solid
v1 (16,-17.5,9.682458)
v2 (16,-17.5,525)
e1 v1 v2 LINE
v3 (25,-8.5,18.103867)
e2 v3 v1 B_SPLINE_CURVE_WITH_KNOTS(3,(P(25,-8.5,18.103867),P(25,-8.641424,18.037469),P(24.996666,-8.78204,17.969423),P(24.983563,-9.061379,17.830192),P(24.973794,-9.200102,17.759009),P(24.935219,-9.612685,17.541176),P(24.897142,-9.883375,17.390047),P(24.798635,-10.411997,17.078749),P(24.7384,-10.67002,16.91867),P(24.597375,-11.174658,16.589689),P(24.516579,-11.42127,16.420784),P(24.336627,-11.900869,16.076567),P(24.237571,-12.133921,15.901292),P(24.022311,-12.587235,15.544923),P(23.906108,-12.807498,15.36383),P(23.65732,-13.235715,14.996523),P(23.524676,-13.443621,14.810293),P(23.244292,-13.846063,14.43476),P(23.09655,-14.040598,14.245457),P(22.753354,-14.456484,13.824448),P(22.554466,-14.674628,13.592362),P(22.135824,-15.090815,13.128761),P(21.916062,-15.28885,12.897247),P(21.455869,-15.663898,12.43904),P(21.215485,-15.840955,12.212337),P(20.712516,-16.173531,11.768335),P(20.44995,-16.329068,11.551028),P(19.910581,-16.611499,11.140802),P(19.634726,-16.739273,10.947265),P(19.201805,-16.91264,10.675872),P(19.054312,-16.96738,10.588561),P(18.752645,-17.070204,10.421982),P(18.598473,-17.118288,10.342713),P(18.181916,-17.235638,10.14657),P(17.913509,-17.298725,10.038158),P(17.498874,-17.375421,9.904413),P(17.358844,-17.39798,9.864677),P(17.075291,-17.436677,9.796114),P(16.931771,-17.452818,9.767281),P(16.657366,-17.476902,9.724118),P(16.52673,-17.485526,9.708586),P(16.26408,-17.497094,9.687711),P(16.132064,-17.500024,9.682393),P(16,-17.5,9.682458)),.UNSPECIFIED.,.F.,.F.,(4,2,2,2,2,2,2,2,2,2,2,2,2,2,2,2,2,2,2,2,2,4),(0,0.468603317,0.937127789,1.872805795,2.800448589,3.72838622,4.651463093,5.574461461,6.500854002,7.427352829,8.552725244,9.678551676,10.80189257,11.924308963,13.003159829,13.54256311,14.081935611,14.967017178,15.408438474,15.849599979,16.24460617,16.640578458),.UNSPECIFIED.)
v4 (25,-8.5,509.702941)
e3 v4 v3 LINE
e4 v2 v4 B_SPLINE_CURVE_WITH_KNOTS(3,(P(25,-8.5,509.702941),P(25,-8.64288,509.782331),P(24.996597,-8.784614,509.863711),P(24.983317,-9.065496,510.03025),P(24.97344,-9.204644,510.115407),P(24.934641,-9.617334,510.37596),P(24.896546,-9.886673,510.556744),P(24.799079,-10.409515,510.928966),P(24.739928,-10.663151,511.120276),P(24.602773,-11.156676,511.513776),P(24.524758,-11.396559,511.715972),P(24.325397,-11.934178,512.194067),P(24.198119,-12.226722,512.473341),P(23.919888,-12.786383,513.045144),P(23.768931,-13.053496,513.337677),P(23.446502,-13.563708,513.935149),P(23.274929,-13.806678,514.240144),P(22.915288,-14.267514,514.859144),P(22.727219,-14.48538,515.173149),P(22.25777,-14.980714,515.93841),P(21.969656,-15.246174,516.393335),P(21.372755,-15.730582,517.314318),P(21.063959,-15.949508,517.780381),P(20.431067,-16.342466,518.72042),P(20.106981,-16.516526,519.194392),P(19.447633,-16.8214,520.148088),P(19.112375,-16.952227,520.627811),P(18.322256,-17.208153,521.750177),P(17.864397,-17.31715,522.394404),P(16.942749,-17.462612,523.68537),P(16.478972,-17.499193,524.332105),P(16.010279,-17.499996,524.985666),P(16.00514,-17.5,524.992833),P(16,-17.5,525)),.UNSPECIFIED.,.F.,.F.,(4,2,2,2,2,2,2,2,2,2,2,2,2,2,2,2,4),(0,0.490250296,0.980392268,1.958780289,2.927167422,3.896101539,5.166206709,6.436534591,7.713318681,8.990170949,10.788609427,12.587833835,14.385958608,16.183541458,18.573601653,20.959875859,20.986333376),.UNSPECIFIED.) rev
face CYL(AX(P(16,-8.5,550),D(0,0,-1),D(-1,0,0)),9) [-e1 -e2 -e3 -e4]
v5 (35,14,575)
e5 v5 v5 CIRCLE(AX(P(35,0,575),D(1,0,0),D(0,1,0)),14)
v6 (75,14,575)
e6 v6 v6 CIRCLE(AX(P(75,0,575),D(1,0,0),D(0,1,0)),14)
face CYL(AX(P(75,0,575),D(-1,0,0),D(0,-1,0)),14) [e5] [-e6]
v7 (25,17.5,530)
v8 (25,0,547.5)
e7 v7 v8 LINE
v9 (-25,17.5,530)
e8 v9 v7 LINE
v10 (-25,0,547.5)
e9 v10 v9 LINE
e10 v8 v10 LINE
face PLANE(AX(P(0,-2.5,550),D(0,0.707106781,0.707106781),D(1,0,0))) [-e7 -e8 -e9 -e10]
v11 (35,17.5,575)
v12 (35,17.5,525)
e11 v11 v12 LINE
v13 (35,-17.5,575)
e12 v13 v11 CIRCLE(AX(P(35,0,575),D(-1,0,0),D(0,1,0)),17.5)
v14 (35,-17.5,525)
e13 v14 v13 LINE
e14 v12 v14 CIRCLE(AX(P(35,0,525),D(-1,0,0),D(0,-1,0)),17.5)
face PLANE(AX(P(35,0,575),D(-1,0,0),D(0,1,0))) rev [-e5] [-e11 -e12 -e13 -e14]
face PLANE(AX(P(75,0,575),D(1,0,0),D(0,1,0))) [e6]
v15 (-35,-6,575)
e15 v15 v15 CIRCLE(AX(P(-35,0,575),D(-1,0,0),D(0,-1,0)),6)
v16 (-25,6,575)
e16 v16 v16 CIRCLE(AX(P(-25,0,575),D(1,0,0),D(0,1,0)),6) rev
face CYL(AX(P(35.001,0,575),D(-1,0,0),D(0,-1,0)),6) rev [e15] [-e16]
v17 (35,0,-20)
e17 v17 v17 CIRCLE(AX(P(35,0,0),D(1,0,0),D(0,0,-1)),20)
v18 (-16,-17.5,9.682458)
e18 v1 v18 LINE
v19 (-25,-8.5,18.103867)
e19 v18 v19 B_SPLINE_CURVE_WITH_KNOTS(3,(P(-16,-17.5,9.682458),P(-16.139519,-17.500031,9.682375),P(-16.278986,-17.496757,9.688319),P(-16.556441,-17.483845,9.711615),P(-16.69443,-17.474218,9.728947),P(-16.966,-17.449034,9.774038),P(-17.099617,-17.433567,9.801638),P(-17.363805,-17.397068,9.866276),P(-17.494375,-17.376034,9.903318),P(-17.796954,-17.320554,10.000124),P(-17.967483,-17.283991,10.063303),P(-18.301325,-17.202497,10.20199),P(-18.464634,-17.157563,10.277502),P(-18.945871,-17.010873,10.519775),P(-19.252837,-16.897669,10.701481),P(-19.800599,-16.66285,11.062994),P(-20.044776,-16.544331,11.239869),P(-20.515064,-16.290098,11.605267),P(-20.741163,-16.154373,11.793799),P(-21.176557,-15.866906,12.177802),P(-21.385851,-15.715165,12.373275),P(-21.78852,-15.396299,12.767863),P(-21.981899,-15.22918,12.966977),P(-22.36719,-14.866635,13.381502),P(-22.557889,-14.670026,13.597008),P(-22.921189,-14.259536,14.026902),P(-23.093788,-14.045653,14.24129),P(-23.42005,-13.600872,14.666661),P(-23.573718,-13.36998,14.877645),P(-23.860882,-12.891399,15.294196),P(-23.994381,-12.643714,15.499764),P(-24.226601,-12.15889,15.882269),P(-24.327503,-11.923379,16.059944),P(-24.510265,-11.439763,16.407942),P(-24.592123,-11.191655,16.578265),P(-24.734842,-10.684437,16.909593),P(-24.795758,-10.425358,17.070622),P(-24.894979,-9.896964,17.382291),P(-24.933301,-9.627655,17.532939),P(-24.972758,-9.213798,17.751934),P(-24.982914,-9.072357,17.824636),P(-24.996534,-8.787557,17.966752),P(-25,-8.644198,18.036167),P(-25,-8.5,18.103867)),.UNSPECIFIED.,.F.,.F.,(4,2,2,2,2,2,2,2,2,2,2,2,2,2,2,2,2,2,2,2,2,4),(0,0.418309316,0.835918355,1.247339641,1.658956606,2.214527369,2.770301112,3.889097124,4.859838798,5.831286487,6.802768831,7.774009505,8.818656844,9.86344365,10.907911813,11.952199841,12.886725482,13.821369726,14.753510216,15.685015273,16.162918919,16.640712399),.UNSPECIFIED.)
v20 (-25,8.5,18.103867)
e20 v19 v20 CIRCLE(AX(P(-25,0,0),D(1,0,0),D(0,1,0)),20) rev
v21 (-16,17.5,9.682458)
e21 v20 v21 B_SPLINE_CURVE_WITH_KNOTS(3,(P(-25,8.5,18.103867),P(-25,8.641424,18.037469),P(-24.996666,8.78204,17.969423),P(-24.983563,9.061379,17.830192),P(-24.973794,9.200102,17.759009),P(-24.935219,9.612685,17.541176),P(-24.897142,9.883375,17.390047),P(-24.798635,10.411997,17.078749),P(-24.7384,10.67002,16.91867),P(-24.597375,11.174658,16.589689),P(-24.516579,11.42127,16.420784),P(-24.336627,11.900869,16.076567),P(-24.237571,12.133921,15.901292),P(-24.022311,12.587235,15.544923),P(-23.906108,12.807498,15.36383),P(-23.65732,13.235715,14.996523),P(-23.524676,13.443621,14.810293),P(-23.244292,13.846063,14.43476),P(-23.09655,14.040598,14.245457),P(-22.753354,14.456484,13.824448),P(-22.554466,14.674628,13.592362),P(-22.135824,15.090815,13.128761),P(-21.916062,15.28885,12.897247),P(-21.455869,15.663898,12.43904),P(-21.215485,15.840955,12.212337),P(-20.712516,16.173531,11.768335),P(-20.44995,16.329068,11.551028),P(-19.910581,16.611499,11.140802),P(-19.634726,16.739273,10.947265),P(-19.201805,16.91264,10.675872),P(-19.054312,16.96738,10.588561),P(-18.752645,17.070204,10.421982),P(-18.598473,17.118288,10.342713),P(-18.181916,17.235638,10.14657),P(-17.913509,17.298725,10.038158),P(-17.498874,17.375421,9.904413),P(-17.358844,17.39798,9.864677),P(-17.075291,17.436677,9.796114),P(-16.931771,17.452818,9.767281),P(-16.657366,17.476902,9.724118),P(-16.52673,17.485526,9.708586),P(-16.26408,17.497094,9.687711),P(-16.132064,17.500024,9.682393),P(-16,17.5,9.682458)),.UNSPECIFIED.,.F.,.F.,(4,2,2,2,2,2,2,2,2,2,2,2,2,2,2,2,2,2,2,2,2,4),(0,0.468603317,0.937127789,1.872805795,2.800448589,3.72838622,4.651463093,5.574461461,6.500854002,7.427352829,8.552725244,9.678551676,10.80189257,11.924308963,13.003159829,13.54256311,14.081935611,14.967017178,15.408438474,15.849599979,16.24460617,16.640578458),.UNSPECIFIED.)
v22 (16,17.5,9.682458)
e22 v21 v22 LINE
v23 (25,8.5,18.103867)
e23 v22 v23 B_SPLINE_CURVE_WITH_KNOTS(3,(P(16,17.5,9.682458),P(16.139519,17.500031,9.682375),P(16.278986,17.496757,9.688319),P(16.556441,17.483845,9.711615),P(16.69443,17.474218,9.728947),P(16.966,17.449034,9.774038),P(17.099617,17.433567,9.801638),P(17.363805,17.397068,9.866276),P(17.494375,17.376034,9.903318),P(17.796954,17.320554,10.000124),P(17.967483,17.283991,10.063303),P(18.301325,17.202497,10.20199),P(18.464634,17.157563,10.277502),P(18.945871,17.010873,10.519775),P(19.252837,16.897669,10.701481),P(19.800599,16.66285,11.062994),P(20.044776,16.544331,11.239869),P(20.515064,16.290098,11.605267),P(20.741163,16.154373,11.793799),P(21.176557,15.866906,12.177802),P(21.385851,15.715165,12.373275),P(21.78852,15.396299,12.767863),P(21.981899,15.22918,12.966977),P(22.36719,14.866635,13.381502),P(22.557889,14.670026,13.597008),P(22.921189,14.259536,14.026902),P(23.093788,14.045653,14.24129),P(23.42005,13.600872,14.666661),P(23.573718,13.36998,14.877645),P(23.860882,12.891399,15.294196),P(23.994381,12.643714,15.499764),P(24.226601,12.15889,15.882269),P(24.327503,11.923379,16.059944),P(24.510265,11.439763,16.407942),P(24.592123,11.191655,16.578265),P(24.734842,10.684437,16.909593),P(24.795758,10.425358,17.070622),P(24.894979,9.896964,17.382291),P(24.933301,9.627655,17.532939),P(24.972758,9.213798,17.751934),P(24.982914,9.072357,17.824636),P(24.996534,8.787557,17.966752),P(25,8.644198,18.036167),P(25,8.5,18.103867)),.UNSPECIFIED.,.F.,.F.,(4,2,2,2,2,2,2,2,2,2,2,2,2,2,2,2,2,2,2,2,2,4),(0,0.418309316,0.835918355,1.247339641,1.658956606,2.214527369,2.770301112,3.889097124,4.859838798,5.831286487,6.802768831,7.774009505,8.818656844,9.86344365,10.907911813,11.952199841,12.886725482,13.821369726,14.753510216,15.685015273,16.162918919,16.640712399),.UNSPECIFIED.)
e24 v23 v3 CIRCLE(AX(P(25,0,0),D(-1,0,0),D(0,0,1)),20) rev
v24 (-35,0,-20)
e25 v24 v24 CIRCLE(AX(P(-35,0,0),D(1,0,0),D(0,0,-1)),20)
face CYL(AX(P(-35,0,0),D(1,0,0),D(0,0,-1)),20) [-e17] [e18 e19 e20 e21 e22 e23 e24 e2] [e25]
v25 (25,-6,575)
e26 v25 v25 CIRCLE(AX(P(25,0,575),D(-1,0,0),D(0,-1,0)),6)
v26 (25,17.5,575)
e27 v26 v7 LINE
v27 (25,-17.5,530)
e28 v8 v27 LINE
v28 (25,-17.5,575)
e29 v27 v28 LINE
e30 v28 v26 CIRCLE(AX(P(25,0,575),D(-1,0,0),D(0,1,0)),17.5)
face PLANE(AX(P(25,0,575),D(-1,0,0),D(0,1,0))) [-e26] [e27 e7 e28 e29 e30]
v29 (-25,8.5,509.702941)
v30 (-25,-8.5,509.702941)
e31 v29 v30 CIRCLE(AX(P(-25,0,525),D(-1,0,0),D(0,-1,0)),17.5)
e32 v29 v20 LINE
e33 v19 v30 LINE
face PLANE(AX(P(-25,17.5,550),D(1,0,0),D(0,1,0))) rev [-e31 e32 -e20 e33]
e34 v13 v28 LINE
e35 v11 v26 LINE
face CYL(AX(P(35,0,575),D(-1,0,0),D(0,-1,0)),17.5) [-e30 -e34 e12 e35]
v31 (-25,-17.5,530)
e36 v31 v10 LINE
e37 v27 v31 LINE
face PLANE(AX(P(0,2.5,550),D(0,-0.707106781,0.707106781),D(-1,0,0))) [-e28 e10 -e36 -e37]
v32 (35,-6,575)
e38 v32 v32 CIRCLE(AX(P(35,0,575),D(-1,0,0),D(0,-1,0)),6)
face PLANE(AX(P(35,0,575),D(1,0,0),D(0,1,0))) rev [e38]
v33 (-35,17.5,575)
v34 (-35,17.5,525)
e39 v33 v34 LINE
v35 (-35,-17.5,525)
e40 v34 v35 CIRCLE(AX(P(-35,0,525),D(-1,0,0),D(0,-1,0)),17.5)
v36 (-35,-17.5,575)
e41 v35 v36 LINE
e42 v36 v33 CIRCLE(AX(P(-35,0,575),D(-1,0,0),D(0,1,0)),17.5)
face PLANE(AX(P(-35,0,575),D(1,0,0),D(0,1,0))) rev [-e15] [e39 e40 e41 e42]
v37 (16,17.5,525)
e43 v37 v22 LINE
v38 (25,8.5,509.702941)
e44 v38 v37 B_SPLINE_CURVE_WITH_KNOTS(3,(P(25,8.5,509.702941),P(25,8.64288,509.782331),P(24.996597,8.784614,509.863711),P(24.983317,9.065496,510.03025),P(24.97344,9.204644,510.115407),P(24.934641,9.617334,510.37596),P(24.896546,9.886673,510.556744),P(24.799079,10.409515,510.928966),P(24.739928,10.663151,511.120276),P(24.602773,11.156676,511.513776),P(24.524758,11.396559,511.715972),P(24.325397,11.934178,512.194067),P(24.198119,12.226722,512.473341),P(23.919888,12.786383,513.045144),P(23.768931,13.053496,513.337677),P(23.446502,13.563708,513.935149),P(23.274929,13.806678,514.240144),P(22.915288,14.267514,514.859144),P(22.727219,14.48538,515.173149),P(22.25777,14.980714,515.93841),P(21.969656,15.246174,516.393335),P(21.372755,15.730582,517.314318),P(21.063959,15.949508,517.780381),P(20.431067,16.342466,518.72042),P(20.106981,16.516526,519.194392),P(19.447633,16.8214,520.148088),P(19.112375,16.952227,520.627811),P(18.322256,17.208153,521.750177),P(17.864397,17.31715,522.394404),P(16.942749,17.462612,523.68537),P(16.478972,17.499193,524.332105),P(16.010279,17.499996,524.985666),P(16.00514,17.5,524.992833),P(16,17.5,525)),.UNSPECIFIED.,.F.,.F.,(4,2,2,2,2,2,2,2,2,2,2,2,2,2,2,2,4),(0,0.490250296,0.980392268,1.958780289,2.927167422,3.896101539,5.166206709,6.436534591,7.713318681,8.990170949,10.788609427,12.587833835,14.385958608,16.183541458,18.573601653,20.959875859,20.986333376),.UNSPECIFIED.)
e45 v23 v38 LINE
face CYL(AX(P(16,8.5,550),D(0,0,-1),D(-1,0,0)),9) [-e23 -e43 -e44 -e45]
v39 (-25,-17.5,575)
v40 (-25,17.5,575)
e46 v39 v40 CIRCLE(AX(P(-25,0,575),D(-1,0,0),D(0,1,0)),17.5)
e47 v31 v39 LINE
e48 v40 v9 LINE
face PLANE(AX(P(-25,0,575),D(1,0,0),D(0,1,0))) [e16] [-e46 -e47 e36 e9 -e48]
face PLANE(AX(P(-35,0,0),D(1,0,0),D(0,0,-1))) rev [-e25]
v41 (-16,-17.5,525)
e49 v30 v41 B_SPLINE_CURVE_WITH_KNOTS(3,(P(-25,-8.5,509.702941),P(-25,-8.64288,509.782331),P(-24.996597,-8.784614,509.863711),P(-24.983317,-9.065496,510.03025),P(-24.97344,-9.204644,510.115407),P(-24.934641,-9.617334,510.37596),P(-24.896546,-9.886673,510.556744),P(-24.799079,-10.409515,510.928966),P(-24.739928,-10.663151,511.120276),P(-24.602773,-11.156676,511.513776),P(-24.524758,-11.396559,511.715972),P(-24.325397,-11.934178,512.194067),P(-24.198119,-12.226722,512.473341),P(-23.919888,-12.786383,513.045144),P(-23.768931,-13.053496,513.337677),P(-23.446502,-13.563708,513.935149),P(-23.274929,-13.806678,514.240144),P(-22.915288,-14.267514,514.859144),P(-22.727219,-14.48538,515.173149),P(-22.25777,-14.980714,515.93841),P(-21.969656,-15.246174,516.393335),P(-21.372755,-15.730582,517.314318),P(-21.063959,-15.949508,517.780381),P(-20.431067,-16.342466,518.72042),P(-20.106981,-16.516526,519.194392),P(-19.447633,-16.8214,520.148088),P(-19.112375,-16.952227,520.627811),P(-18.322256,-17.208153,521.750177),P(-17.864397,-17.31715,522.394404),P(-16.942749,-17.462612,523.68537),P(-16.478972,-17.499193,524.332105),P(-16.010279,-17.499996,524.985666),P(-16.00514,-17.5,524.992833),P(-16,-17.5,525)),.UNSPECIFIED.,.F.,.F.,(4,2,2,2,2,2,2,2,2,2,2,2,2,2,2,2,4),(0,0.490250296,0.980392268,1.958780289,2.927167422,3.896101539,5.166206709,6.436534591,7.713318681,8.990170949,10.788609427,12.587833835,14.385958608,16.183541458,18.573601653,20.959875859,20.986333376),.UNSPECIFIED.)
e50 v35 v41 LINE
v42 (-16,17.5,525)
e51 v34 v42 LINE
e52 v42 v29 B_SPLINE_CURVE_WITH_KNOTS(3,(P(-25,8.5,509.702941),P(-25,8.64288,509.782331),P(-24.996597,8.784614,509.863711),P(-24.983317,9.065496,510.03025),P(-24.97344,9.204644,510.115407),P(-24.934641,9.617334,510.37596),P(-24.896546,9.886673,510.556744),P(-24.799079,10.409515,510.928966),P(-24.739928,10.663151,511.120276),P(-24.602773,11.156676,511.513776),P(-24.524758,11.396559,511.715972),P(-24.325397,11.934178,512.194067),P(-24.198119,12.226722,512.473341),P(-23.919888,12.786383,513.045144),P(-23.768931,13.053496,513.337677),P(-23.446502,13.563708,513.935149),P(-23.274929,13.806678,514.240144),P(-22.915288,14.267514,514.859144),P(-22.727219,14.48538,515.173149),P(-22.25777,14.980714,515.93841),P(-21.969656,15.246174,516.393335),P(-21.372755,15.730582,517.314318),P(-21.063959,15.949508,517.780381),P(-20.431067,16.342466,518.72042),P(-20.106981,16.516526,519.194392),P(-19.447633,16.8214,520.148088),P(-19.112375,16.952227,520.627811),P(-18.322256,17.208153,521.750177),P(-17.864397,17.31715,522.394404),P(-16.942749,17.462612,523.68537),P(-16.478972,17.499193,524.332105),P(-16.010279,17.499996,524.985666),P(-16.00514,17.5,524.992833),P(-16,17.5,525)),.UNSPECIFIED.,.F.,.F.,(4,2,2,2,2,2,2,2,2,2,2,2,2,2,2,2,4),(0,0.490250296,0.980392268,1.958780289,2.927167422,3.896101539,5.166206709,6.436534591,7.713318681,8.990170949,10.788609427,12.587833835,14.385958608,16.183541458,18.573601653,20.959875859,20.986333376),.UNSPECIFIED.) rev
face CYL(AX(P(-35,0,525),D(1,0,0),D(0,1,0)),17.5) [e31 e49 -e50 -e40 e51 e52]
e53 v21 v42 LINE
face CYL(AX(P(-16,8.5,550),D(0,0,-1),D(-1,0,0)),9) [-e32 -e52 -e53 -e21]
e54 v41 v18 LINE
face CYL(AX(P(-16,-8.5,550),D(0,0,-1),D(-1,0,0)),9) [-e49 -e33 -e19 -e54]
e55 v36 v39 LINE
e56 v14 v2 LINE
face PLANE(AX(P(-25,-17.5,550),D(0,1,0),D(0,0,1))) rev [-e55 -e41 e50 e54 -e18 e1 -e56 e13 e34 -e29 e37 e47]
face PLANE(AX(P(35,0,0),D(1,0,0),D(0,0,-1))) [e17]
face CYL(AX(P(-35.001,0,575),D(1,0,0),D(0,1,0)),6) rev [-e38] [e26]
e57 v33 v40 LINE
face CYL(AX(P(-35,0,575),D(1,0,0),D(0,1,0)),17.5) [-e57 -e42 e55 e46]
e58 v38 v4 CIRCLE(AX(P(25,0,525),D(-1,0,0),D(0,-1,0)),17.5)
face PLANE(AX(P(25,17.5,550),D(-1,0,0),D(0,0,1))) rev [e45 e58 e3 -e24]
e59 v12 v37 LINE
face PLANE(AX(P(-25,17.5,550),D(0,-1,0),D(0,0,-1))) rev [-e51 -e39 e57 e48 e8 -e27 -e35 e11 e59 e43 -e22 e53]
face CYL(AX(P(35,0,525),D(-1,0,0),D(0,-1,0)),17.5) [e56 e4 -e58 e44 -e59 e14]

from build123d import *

# Parameters (mm, degrees)
AUFSATZ_LINEAR_AUSTRAGEN1_DEPTH      = 35
AUFSATZ_LINEAR_AUSTRAGEN1_DEPTH_BACK = 35
SKIZZE1_R                            = 20
SKIZZE2_W                            = 50
SKIZZE2_H                            = 35
AUFSATZ_LINEAR_AUSTRAGEN2_DEPTH      = 550
AUFSATZ_LINEAR_AUSTRAGEN3_DEPTH      = 10
SCHNITT_LINEAR_AUSTRAGEN1_REACH      = 598.956
SKIZZE4_R                            = 6
SKIZZE5_R                            = 14
AUFSATZ_LINEAR_AUSTRAGEN4_DEPTH      = 40
VERRUNDUNG1_R                        = 9
FASE2_SIZE                           = 20


with BuildPart() as part:
    # Skizze1 → Aufsatz-Linear austragen1 (new, two sides: drawn at the far end of the back side and taken through both)
    with BuildSketch(Plane(origin=(0, 0, 0), x_dir=(0, 0, -1), z_dir=(1, 0, 0)).offset(-AUFSATZ_LINEAR_AUSTRAGEN1_DEPTH_BACK)):
        Circle(SKIZZE1_R)
    extrude(amount=AUFSATZ_LINEAR_AUSTRAGEN1_DEPTH + AUFSATZ_LINEAR_AUSTRAGEN1_DEPTH_BACK)

    # Skizze2 → Aufsatz-Linear austragen2 (add)
    with BuildSketch(Plane.XY):
        Rectangle(SKIZZE2_W, SKIZZE2_H)
    extrude(amount=AUFSATZ_LINEAR_AUSTRAGEN2_DEPTH)

    # Skizze3 → Aufsatz-Linear austragen3 (add)
    with BuildSketch(Plane.ZY.offset(25)):
        with BuildLine():
            Line((550, 17.5), (525, 17.5))
            ThreePointArc((525, 17.5), (507.5, 0), (525, -17.5))
            Line((525, -17.5), (550, -17.5))
            Line((550, -17.5), (575, -17.5))
            ThreePointArc((575, -17.5), (592.5, 0), (575, 17.5))
            Line((575, 17.5), (550, 17.5))
        make_face()
    aufsatz_linear_austragen3 = extrude(amount=AUFSATZ_LINEAR_AUSTRAGEN3_DEPTH)

    # Skizze4 → Schnitt-Linear austragen1 (cut, up to next)
    with BuildSketch(Plane.ZY.offset(35), mode=Mode.PRIVATE) as schnitt_linear_austragen1_sk1:
        with Locations(Location((575, 0, 0), (0, 0, 270))):
            Circle(SKIZZE4_R)
    schnitt_linear_austragen1_tool1 = extrude(schnitt_linear_austragen1_sk1.sketch, amount=-SCHNITT_LINEAR_AUSTRAGEN1_REACH, mode=Mode.PRIVATE) & part.part
    schnitt_linear_austragen1 = schnitt_linear_austragen1_tool1.solids().sort_by_distance((-35, 0, 575))[0]
    add(schnitt_linear_austragen1, mode=Mode.SUBTRACT)

    # Spiegeln1: Aufsatz-Linear austragen3, Schnitt-Linear austragen1 across plane
    add(aufsatz_linear_austragen3.mirror(Plane(origin=(0, 0, 0), x_dir=(0, 0, 1), z_dir=(1, 0, 0))))
    add(schnitt_linear_austragen1.mirror(Plane(origin=(0, 0, 0), x_dir=(0, 0, 1), z_dir=(1, 0, 0))), mode=Mode.SUBTRACT)

    # Skizze5 → Aufsatz-Linear austragen4 (add)
    with BuildSketch(Plane(origin=(35, 0, 0), x_dir=(0, 0, -1), z_dir=(1, 0, 0))):
        with Locations(Location((-575, 0, 0), (0, 0, 90))):
            Circle(SKIZZE5_R)
    extrude(amount=AUFSATZ_LINEAR_AUSTRAGEN4_DEPTH)

    # Verrundung1
    verrundung1_edges = [part.edges().sort_by_distance(p)[0] for p in [
        (-25, 17.5, 267.341229183),
        (-25, -17.5, 267.341229183),
        (25, 17.5, 267.341229183),
        (25, -17.5, 267.341229183),
    ]]
    fillet(verrundung1_edges, radius=VERRUNDUNG1_R)

    # Fase2
    # the kernel refuses this chamfer: 20 mm, written as the material it takes off along each edge
    with BuildSketch(Plane(origin=(25, -17.5, 550), x_dir=(0, -0.027495876610586282, -0.9996219169112968), z_dir=(-1, 0, 0))) as fase2_piece_1:
        Polygon((FASE2_SIZE * 0.999621916911, -FASE2_SIZE * 0.0274958766106), (-FASE2_SIZE * 0.0274958766106, -FASE2_SIZE * 0.999621916911), (0, 0), align=None)
    extrude(amount=50, mode=Mode.SUBTRACT)
    with BuildSketch(Plane(origin=(-25, 17.5, 550), x_dir=(0, -0.9996219169112968, 0.0274958766105877), z_dir=(1, 0, 0))) as fase2_piece_2:
        Polygon((FASE2_SIZE * 0.999621916911, FASE2_SIZE * 0.0274958766106), (-FASE2_SIZE * 0.0274958766106, FASE2_SIZE * 0.999621916911), (0, 0), align=None)
    extrude(amount=50, mode=Mode.SUBTRACT)


solid = part.part
